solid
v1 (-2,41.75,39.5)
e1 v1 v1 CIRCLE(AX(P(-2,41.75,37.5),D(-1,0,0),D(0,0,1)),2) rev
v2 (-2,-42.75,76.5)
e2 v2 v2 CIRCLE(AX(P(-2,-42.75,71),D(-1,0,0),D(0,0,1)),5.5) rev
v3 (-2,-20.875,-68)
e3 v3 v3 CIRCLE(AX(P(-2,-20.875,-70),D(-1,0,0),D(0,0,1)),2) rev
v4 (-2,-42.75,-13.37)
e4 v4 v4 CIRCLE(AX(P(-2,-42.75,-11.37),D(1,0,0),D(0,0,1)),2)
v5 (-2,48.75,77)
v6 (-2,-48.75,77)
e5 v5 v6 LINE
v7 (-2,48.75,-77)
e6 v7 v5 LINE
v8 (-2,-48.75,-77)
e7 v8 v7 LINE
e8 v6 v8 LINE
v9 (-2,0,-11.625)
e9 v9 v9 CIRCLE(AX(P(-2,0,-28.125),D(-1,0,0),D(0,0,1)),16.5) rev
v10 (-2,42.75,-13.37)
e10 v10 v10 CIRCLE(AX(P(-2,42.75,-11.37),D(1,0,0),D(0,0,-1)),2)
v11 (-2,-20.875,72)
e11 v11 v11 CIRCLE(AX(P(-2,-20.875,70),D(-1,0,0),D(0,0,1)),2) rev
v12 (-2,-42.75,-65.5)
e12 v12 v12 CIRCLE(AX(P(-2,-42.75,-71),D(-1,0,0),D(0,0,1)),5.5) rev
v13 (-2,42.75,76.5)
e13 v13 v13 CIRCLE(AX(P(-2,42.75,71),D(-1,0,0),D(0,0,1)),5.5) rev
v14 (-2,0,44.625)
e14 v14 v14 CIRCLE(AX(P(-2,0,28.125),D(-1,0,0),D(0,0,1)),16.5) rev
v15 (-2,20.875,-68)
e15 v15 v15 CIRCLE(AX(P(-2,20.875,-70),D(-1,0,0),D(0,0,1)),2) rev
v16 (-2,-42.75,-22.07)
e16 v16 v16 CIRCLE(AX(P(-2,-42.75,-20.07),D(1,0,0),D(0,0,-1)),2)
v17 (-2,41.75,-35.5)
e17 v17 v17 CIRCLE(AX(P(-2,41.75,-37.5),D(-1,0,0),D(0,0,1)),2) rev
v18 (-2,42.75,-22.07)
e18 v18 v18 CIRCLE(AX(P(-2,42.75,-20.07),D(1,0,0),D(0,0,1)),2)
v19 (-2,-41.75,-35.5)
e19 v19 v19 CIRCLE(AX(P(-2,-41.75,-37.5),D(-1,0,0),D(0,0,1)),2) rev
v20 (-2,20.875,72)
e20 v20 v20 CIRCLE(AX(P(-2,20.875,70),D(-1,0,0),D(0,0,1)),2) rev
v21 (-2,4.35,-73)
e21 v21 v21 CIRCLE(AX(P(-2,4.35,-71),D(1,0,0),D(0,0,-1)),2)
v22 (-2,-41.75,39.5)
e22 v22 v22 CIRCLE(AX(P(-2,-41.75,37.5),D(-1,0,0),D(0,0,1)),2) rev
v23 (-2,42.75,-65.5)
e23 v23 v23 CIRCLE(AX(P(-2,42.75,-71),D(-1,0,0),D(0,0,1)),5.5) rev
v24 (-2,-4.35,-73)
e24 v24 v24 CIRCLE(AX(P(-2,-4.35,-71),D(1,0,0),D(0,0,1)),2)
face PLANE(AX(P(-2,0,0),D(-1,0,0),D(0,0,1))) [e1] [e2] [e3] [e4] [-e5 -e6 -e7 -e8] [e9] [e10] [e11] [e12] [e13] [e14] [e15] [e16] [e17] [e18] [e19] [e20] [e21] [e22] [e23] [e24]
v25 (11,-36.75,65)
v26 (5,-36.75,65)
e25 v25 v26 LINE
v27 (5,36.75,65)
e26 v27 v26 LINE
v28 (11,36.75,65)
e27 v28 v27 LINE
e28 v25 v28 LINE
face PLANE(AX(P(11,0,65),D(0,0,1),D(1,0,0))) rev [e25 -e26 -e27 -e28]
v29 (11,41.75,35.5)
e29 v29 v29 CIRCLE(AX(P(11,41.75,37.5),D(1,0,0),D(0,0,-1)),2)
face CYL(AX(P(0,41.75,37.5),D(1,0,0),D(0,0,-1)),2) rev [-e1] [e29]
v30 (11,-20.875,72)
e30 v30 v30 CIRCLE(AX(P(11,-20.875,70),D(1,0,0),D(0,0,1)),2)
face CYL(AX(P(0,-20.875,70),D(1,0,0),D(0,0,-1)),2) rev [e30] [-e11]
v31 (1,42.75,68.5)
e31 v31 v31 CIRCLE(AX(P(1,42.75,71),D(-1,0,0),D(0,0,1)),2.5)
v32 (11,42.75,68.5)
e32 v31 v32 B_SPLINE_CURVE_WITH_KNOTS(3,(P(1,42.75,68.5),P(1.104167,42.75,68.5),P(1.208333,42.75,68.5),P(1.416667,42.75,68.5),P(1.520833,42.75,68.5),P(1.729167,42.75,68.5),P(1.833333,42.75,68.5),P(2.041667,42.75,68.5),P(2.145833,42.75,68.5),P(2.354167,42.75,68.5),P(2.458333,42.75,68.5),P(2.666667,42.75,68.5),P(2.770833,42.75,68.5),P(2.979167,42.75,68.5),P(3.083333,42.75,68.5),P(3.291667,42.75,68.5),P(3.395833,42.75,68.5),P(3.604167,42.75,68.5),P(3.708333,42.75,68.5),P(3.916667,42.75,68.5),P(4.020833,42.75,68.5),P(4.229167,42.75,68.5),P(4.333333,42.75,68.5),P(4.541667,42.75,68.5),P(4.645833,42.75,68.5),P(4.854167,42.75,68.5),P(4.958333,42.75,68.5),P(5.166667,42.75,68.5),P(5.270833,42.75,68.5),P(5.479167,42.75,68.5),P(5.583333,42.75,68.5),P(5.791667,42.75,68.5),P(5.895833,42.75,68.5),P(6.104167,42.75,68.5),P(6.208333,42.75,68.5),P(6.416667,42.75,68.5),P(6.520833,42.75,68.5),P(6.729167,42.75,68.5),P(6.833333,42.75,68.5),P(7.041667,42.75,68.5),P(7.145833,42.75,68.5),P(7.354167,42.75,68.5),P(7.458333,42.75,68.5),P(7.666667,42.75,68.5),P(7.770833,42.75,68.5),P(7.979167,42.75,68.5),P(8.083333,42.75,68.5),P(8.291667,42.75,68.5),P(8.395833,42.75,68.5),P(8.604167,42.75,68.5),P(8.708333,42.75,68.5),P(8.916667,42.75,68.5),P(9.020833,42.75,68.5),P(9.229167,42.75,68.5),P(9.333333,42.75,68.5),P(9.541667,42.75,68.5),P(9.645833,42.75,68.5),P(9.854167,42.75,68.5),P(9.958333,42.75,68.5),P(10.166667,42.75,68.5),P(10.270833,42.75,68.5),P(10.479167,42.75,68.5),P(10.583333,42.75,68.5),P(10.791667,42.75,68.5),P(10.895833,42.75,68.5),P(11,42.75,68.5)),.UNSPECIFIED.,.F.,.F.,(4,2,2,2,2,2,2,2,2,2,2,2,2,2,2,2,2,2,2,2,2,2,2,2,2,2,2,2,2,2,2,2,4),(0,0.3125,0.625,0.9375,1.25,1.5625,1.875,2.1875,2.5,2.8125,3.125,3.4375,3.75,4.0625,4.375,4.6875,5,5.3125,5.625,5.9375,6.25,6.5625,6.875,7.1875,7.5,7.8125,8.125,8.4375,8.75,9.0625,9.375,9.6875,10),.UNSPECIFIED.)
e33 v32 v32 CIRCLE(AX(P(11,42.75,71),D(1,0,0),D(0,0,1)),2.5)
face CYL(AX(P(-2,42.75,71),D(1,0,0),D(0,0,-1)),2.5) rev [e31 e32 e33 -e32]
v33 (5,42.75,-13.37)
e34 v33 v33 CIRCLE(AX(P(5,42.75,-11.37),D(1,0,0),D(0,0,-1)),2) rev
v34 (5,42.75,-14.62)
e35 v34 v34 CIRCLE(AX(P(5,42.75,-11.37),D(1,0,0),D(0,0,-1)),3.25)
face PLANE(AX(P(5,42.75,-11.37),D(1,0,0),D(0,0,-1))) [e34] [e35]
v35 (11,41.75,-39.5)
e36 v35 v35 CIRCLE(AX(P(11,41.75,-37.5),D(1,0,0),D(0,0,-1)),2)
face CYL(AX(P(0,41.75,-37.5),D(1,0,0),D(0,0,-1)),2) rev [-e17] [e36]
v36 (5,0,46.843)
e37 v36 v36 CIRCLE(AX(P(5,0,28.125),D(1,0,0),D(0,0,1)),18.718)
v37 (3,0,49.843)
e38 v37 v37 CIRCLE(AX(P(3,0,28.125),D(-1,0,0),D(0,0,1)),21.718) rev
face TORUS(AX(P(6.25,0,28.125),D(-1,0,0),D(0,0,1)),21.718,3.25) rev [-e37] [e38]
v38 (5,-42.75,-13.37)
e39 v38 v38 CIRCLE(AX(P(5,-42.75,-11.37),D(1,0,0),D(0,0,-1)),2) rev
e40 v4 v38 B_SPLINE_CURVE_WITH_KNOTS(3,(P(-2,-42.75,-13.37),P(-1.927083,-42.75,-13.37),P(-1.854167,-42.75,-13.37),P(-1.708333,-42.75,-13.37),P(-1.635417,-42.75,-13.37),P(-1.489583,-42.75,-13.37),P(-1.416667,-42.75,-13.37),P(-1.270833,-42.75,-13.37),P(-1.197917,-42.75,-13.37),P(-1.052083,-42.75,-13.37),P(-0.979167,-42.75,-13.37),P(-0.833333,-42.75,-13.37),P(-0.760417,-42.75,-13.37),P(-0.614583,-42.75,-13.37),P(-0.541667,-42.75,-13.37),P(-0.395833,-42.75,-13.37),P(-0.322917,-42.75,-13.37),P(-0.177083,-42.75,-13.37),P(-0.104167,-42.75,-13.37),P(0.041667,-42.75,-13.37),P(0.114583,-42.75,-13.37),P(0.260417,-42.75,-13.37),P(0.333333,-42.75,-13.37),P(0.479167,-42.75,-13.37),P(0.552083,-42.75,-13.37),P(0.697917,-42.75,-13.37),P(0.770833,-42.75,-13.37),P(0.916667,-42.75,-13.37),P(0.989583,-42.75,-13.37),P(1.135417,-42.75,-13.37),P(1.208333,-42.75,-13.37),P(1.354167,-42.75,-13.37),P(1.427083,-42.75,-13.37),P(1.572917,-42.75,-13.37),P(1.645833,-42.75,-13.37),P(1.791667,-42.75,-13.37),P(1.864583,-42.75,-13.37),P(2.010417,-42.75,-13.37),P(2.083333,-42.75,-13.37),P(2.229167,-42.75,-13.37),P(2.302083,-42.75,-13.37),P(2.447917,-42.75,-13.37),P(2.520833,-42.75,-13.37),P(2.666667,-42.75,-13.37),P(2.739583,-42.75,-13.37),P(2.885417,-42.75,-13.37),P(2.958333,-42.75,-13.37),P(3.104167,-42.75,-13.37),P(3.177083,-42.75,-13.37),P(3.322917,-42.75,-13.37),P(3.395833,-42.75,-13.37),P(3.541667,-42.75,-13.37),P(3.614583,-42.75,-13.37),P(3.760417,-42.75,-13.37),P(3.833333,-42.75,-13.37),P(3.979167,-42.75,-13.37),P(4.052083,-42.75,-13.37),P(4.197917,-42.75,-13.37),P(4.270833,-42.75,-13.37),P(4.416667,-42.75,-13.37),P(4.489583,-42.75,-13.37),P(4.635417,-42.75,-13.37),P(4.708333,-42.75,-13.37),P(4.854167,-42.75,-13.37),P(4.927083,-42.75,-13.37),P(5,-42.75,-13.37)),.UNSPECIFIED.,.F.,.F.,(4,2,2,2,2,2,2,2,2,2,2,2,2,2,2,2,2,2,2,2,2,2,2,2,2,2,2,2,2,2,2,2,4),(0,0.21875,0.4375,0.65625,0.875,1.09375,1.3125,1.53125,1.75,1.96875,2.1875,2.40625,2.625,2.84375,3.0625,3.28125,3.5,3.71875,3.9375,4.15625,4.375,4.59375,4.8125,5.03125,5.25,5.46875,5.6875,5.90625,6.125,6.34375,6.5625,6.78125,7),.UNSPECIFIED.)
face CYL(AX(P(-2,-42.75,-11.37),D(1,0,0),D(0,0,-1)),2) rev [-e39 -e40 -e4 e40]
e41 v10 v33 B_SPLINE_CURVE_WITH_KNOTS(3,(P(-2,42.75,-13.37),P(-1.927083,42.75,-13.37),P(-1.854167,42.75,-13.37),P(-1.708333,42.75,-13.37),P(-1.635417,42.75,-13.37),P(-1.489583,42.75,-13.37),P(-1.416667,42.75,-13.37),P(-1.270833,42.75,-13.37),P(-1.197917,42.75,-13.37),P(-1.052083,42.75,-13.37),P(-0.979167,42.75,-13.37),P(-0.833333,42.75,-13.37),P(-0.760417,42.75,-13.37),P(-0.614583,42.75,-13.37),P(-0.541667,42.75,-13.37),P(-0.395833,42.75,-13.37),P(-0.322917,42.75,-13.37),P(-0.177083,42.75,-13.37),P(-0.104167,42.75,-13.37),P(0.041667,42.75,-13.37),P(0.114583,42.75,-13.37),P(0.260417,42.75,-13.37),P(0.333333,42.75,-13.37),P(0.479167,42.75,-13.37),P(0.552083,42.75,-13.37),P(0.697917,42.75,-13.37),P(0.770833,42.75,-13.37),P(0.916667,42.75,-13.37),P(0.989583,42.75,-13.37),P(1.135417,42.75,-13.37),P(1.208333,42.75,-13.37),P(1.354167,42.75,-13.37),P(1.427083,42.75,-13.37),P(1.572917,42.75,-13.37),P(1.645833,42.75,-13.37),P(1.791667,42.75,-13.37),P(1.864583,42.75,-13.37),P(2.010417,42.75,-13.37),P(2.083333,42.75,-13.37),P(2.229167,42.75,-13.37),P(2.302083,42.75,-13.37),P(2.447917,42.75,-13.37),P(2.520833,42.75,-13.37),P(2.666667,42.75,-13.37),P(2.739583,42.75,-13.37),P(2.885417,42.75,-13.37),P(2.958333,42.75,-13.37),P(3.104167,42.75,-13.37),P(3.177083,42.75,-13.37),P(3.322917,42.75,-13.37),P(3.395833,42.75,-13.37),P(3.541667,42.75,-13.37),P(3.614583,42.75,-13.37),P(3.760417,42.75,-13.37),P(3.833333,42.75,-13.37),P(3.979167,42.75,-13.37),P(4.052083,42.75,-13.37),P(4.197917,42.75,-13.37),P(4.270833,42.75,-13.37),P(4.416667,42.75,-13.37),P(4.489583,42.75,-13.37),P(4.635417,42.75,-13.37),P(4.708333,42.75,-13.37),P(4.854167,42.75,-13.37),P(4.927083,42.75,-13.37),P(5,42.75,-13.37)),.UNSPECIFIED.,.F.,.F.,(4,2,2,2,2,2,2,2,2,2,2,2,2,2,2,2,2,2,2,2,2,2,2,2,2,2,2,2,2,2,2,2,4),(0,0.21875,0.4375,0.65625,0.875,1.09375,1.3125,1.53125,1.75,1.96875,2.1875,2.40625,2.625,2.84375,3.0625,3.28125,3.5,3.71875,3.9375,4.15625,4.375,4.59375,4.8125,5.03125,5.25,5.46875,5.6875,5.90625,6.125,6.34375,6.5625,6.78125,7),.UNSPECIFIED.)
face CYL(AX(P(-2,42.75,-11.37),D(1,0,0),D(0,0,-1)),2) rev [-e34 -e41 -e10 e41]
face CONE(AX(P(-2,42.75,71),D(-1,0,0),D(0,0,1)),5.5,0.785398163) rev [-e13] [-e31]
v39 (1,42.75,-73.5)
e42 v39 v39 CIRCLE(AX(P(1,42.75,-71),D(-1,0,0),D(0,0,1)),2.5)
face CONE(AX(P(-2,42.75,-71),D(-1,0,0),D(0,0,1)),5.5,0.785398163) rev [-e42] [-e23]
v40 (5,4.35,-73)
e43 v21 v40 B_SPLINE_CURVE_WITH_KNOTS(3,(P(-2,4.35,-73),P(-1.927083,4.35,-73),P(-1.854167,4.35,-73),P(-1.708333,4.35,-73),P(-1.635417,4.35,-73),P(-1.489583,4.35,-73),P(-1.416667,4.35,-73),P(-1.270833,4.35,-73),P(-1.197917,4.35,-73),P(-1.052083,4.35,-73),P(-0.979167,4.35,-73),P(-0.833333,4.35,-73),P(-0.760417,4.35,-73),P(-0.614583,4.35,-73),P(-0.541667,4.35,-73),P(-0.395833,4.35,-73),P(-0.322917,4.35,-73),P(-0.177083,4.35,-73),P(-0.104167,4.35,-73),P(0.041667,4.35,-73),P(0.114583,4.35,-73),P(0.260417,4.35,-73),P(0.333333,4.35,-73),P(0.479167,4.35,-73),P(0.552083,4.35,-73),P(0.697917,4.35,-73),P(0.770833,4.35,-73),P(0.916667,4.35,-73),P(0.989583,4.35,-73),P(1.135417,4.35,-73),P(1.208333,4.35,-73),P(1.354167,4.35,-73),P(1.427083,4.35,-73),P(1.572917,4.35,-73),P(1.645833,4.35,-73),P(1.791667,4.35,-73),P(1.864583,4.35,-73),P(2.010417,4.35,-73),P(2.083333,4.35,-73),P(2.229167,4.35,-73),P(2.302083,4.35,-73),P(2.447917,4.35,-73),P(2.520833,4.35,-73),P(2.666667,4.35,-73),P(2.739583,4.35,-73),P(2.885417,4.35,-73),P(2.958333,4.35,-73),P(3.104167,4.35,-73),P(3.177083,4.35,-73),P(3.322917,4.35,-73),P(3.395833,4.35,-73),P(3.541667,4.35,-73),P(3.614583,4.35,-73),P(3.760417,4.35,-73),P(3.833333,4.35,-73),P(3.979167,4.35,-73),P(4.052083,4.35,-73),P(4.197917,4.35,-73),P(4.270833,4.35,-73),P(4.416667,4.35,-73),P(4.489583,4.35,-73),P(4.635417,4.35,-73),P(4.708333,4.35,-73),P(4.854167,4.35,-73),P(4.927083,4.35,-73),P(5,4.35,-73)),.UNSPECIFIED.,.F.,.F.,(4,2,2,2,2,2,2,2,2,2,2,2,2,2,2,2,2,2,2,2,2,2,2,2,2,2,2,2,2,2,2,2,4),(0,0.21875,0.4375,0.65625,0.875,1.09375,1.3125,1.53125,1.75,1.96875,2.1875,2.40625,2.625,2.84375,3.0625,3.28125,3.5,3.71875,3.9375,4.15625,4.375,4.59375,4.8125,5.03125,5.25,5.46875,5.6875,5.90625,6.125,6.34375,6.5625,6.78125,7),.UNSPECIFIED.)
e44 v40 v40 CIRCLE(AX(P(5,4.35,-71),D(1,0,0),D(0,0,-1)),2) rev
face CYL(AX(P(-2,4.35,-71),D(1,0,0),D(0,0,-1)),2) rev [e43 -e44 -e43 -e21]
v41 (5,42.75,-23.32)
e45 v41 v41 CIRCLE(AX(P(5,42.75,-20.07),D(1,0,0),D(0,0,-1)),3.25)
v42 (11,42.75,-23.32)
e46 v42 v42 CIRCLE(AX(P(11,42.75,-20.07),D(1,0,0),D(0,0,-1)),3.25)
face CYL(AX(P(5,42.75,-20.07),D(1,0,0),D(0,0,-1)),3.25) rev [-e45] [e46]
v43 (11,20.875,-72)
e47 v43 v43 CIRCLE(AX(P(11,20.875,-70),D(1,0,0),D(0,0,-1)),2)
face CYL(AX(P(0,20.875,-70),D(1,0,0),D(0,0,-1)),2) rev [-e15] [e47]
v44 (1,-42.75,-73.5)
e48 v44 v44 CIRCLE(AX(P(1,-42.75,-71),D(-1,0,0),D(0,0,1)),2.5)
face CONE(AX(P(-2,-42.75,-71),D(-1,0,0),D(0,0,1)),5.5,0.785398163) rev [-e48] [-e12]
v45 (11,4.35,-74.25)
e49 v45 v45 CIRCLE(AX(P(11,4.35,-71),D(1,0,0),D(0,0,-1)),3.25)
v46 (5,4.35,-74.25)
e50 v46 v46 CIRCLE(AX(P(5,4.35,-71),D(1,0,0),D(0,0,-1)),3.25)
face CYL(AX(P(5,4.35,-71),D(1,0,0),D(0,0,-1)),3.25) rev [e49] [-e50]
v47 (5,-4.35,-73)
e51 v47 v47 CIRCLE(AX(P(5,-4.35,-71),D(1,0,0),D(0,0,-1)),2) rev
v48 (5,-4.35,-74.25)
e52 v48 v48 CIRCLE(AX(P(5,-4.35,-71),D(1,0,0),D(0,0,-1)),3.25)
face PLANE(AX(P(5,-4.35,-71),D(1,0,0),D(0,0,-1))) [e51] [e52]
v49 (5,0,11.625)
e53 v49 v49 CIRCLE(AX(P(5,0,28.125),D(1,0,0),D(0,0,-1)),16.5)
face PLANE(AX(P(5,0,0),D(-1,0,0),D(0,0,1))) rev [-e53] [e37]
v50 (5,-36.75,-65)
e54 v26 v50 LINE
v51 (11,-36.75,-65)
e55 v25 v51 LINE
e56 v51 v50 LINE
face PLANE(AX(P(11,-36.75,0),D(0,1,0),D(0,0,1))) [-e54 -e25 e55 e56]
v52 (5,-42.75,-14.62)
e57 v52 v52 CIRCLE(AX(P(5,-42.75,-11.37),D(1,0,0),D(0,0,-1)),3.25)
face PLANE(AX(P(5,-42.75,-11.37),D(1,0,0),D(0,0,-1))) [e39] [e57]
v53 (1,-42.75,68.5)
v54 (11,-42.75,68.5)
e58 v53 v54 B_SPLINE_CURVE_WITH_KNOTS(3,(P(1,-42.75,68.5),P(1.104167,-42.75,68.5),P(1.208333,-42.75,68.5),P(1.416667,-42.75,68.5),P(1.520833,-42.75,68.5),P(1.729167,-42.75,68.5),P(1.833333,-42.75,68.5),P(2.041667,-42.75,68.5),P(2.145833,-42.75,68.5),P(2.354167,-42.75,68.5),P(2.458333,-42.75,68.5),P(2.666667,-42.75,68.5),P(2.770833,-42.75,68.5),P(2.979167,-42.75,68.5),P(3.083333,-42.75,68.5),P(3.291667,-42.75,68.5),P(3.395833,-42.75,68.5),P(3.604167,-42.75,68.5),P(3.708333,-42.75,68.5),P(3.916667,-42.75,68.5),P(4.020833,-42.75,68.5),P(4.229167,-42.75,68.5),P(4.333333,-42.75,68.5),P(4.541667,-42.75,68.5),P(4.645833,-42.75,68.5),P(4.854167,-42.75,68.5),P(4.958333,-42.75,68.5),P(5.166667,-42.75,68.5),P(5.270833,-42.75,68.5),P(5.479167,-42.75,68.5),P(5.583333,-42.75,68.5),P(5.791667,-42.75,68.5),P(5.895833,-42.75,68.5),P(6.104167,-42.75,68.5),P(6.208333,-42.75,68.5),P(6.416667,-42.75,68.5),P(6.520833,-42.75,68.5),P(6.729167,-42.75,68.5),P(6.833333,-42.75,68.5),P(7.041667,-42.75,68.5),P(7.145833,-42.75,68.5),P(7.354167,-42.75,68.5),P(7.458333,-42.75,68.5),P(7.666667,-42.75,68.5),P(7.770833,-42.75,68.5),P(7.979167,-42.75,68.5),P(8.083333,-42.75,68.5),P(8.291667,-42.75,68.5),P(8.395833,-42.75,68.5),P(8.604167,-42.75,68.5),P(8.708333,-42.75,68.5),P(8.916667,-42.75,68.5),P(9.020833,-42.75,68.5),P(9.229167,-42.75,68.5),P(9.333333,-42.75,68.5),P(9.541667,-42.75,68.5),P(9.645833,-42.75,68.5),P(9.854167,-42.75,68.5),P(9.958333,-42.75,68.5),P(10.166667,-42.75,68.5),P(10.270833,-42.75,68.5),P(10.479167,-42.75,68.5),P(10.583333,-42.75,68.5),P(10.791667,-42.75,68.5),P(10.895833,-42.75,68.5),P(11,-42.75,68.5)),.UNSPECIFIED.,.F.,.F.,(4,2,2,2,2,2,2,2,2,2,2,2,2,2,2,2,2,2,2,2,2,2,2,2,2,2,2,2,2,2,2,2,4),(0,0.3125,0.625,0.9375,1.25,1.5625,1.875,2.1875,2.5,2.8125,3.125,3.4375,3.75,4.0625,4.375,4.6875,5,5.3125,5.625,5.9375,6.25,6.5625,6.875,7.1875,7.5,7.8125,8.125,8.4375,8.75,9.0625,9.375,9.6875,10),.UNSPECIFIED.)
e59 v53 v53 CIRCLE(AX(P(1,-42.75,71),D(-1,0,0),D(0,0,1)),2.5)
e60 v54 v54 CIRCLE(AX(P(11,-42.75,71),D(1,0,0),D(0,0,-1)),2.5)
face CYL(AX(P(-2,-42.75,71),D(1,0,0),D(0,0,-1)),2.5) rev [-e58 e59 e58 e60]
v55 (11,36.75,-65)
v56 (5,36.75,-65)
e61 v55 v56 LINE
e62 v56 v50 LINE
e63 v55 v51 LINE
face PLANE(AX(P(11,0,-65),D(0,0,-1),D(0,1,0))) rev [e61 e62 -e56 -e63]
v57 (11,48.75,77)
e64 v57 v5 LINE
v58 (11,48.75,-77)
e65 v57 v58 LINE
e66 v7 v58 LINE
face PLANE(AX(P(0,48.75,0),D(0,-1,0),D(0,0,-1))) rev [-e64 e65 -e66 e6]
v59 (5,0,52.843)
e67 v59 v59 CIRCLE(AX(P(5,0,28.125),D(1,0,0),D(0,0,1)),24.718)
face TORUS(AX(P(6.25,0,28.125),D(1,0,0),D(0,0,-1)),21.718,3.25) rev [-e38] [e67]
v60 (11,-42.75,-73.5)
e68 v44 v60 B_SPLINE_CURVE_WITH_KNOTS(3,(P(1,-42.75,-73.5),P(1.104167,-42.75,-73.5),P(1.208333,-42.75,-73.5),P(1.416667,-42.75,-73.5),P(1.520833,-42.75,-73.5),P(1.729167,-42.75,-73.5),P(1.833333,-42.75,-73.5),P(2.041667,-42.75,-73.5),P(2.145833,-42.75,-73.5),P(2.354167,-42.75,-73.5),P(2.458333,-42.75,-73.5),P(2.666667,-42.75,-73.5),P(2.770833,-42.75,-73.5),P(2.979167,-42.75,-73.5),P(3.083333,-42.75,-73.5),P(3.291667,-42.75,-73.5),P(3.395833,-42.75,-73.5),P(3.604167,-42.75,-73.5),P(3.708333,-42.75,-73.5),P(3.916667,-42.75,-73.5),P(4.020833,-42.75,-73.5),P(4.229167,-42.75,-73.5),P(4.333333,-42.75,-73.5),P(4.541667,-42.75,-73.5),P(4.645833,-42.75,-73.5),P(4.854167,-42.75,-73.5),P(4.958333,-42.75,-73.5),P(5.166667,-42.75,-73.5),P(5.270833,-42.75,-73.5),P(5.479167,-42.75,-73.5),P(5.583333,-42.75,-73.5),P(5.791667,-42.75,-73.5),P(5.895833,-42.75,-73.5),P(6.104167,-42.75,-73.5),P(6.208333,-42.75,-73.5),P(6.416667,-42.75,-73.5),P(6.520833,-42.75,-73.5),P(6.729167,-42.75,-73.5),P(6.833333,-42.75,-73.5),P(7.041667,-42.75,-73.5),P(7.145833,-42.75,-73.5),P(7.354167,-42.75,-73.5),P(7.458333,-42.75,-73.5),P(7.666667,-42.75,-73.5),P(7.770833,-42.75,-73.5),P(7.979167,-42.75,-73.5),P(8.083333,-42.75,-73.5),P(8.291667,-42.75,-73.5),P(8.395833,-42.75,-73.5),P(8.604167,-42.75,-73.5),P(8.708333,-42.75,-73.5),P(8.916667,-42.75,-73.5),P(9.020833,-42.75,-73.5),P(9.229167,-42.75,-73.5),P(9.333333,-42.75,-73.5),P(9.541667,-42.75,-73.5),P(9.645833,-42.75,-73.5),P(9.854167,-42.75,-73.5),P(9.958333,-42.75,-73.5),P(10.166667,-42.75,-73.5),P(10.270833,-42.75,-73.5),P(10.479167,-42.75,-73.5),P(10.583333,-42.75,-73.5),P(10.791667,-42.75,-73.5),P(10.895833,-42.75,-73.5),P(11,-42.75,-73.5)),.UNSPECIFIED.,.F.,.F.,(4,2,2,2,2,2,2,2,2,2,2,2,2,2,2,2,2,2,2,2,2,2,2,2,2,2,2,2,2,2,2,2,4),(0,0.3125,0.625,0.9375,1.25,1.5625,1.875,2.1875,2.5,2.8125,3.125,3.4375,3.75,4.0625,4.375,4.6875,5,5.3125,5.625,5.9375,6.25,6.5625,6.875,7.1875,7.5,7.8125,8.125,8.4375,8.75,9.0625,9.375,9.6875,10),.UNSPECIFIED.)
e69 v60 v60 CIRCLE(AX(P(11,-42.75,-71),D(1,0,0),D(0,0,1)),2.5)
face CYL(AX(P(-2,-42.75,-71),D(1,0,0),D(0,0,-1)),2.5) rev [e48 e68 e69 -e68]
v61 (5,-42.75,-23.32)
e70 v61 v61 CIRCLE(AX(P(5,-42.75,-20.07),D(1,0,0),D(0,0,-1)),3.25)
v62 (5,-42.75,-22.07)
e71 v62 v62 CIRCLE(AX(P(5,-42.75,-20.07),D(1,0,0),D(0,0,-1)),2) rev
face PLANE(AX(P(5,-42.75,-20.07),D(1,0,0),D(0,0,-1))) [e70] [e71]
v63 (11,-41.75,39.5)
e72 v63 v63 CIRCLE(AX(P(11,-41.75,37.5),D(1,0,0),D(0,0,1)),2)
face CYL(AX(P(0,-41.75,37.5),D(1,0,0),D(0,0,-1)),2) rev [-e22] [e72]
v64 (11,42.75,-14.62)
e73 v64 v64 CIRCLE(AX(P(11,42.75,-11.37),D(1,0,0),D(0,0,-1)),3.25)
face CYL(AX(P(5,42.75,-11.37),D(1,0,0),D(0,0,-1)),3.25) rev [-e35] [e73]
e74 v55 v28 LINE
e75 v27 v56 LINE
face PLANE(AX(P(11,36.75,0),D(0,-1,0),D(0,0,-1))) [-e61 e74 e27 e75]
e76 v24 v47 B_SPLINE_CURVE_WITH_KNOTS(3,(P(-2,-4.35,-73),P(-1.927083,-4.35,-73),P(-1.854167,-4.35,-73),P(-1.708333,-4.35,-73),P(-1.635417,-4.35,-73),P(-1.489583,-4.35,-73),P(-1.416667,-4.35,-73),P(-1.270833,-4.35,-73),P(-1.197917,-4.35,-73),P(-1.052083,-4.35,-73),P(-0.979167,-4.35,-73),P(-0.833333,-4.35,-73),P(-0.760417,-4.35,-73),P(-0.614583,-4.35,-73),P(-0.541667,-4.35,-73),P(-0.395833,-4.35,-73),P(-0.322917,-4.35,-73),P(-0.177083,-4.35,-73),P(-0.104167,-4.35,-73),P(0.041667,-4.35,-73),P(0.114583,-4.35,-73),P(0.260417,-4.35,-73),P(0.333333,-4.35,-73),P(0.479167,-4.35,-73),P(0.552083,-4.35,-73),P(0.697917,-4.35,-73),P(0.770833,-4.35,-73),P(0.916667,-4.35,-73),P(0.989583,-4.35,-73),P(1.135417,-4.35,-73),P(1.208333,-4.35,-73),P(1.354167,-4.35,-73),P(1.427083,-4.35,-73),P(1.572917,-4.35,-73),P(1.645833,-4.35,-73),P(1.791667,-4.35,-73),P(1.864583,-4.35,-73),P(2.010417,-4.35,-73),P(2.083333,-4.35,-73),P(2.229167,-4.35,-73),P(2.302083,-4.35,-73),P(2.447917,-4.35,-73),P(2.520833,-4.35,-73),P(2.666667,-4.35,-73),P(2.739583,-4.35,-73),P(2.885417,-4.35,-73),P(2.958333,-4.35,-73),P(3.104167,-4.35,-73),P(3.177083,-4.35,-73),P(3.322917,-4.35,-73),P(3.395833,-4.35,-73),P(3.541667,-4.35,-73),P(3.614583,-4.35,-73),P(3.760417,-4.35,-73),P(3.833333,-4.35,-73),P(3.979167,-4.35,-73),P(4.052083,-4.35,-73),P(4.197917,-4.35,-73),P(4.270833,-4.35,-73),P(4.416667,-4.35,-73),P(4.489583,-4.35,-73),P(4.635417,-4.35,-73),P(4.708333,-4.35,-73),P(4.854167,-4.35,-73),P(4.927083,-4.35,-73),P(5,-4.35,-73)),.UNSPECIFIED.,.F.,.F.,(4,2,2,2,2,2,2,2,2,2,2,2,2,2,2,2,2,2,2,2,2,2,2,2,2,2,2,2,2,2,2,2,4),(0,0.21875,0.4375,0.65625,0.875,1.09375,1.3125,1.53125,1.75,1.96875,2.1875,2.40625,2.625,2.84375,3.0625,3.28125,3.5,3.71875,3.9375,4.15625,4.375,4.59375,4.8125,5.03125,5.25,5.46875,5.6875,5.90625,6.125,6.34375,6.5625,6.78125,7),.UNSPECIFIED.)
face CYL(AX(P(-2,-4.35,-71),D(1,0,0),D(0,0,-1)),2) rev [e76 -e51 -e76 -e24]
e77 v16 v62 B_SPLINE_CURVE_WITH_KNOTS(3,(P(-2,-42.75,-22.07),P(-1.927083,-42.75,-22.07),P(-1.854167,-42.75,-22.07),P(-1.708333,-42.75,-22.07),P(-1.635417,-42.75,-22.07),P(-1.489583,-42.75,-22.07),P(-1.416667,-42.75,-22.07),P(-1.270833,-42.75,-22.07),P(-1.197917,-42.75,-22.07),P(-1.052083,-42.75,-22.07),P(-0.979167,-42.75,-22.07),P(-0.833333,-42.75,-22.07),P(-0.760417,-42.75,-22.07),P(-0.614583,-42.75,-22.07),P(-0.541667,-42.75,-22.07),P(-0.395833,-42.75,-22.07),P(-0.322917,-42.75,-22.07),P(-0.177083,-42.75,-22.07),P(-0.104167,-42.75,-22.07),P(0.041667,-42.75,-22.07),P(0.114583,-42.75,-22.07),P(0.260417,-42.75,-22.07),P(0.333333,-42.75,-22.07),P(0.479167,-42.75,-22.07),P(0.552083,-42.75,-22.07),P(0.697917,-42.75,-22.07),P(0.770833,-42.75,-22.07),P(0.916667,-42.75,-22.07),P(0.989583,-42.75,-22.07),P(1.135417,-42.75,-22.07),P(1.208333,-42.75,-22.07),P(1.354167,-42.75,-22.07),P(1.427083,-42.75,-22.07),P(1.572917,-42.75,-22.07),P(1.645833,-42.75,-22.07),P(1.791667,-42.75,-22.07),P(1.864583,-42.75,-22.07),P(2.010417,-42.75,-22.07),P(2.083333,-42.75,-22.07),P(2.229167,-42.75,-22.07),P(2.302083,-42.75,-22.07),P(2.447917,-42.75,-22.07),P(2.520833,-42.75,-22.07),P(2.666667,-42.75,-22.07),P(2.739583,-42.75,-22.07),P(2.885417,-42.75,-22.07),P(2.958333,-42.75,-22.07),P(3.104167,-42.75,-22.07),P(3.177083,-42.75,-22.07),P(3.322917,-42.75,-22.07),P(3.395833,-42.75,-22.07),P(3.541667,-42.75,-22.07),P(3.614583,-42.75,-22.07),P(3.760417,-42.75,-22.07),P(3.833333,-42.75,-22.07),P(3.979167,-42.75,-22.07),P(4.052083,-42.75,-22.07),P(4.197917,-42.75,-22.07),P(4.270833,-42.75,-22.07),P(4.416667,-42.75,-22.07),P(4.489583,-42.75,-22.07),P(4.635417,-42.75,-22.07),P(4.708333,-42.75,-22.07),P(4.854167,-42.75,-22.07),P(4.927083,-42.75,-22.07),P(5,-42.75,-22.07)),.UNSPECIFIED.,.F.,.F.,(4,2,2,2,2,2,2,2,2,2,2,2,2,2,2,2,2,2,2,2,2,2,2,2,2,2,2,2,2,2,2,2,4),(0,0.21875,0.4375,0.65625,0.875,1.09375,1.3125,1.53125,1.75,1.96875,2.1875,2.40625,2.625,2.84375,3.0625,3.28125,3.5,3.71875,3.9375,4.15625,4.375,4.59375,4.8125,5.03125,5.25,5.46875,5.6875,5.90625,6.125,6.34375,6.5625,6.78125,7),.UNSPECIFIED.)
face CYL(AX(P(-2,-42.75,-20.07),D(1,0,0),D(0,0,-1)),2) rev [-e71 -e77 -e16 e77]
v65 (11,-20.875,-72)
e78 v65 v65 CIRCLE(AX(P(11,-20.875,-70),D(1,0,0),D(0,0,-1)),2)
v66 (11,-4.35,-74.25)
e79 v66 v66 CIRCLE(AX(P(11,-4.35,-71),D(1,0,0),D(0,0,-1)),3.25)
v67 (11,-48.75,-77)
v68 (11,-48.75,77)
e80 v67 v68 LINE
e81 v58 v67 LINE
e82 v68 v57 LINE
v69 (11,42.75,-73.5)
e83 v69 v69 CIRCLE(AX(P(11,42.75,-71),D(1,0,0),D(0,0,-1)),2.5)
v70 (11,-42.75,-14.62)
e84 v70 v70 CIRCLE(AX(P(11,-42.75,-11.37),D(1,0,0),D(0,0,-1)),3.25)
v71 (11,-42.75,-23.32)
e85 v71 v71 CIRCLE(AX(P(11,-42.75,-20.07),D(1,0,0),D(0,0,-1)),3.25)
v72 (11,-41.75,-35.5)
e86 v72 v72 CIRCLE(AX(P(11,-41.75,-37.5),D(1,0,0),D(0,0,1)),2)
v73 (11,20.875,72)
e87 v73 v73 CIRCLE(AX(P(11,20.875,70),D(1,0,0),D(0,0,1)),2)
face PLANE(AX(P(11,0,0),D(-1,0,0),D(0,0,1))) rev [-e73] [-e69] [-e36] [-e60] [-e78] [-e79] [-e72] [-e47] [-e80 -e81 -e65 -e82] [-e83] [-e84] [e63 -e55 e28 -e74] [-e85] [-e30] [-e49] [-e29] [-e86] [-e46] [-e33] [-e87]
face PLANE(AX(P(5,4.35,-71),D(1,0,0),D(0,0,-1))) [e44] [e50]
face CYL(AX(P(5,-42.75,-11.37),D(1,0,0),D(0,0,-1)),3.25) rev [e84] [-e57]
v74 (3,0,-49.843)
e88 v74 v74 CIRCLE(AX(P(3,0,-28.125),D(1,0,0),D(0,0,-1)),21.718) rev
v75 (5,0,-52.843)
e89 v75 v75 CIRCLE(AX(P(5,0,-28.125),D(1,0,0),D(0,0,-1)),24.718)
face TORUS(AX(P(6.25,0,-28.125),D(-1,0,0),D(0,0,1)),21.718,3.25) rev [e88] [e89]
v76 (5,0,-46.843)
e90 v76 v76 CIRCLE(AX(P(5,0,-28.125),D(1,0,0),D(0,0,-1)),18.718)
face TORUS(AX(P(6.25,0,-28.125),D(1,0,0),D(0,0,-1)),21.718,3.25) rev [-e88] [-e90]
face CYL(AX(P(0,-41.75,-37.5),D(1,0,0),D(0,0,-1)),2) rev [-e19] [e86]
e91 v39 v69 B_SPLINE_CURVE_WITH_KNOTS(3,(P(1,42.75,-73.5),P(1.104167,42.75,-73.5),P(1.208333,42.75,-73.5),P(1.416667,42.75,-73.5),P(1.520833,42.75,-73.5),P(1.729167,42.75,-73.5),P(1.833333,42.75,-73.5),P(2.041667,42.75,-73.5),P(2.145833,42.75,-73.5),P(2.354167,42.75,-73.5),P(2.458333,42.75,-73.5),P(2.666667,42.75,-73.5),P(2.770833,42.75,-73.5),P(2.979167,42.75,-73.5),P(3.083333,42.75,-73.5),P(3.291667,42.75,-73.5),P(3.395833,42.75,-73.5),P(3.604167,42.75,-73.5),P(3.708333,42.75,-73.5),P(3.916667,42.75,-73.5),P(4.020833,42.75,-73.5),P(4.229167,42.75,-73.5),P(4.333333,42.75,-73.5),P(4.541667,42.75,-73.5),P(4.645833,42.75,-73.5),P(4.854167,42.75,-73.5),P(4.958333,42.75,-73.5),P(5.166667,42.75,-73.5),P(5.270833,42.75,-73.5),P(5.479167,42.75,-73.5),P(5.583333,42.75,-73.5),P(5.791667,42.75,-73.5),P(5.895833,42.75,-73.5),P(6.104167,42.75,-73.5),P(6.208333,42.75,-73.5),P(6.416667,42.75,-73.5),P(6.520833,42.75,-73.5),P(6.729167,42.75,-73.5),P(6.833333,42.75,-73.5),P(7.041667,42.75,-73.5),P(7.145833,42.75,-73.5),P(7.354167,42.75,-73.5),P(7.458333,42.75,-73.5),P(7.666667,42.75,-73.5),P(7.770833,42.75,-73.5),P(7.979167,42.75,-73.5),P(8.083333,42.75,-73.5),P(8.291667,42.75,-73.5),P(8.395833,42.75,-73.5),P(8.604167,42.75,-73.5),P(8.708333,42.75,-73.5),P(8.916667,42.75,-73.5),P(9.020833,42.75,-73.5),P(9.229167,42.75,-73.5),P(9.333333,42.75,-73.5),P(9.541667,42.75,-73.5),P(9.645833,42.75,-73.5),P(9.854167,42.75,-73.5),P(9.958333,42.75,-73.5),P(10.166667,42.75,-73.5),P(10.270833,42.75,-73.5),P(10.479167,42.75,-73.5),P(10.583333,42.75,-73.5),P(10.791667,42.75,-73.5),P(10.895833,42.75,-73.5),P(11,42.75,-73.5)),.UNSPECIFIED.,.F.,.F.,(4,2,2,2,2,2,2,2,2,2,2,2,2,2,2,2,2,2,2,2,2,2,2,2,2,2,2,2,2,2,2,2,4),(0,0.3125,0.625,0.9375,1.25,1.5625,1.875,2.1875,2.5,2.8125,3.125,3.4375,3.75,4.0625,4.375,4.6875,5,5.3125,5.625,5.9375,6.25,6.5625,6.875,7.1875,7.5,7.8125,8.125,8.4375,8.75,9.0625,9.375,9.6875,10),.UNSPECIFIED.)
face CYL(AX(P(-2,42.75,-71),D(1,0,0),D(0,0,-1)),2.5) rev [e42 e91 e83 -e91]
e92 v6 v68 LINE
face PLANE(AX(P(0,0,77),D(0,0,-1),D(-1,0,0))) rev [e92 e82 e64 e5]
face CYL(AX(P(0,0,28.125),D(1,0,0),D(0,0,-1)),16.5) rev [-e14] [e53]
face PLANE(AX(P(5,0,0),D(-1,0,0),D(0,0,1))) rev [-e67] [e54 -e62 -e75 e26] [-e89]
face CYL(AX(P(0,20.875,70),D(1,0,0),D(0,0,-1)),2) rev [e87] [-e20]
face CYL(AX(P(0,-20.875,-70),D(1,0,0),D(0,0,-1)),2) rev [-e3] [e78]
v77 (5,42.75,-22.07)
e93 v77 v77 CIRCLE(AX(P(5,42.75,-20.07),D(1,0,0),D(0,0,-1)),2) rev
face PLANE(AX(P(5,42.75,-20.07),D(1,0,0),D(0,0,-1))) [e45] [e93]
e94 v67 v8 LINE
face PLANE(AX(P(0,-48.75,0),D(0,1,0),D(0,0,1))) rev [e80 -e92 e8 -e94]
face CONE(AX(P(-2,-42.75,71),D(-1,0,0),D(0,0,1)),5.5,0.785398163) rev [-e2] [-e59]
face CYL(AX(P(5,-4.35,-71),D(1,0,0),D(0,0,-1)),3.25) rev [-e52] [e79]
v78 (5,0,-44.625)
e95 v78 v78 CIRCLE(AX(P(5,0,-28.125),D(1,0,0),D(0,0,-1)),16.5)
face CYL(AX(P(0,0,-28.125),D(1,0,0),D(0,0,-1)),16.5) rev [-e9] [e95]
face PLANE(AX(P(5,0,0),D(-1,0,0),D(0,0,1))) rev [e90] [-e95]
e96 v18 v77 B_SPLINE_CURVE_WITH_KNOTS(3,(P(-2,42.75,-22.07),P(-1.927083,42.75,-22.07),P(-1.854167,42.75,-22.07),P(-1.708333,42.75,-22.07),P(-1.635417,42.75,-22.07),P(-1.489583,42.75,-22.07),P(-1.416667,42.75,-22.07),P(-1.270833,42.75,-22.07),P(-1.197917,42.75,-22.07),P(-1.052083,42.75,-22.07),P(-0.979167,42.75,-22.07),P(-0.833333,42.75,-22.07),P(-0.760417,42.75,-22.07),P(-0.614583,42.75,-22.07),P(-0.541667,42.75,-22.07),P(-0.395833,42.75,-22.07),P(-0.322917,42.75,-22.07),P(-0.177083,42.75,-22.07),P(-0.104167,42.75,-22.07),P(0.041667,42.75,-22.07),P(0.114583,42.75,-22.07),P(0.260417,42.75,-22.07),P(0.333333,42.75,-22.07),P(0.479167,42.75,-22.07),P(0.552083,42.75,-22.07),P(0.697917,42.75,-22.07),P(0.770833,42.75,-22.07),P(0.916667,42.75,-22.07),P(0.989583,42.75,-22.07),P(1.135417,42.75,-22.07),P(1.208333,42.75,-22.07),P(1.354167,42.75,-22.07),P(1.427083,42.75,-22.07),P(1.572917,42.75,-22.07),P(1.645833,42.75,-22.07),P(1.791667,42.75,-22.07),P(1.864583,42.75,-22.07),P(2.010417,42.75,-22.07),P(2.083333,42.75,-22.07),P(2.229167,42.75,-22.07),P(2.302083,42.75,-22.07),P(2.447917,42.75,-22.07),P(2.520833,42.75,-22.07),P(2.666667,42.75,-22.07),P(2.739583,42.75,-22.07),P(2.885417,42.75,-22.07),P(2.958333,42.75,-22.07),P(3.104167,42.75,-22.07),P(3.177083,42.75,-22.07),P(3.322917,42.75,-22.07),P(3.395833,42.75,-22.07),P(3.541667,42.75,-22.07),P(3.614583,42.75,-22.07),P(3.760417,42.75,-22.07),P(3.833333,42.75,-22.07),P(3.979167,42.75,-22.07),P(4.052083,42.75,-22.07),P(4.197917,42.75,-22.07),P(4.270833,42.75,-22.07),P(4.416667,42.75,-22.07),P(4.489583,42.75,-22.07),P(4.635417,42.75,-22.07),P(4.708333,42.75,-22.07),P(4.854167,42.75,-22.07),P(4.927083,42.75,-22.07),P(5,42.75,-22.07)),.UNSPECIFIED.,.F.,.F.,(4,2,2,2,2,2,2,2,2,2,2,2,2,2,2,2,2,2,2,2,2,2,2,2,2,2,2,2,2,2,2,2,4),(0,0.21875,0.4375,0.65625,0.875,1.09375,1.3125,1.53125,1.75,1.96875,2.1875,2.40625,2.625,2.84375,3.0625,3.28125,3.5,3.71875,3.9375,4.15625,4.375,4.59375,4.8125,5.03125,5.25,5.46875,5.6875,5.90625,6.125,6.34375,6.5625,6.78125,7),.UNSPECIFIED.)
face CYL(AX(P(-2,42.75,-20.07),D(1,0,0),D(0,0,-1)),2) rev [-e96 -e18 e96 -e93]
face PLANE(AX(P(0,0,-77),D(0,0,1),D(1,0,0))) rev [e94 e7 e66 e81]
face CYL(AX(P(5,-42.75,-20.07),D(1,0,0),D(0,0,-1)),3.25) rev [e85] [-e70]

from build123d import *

# Parameters (mm, degrees)
SKETCH1_W           = 130
SKETCH1_H           = 73.5
BOSS_EXTRUDE1_DEPTH = 5
SKETCH2_R           = 24.718
SKETCH2_R_2         = 18.718
CUT_EXTRUDE1_DEPTH  = 2
FILLET1_R           = 3.25
SKETCH3_W           = 10
SKETCH3_H           = 73.5
BOSS_EXTRUDE2_DEPTH = 11
SKETCH4_R           = 2
CUT_EXTRUDE2_DEPTH  = 90.059320119
SKETCH5_R           = 16.5
CUT_EXTRUDE3_DEPTH  = 89.580824674
SKETCH7_W           = 150
SKETCH7_H           = 93.5
SKETCH7_R           = 16.5
SKETCH7_R_2         = 2
BOSS_EXTRUDE3_DEPTH = 2
SKETCH8_R           = 2
CUT_EXTRUDE5_DEPTH  = 90.328396941
SKETCH9_R           = 3.25
CUT_EXTRUDE6_DEPTH  = 6
SKETCH10_W          = 13
SKETCH10_H          = 150
BOSS_EXTRUDE4_DEPTH = 2
SKETCH11_W          = 13
SKETCH11_H          = 150
BOSS_EXTRUDE5_DEPTH = 2
SKETCH12_W          = 13
SKETCH12_H          = 97.5
BOSS_EXTRUDE6_DEPTH = 2
SKETCH13_W          = 13
SKETCH13_H          = 97.5
BOSS_EXTRUDE7_DEPTH = 2
SKETCH14_R          = 2.5
CUT_EXTRUDE7_DEPTH  = 93.057386993
CHAMFER1_SIZE       = 3


with BuildPart() as part:
    # Sketch1 → Boss-Extrude1 (new body)
    with BuildSketch(Plane(origin=(0, 0, 0), x_dir=(0, 0, -1), z_dir=(1, 0, 0))):
        Rectangle(SKETCH1_W, SKETCH1_H)
    extrude(amount=BOSS_EXTRUDE1_DEPTH)

    # Sketch2 → Cut-Extrude1 (cut)
    # profile 1 of 2: a face of its own
    with BuildSketch(Plane(origin=(5, 0, 0), x_dir=(0, 0, -1), z_dir=(1, 0, 0))):
        with Locations((28.125, 0)):
            Circle(SKETCH2_R)
        with Locations((28.125, 0)):
            Circle(SKETCH2_R_2, mode=Mode.SUBTRACT)
    # profile 2 of 2: a face of its own
    with BuildSketch(Plane(origin=(5, 0, 0), x_dir=(0, 0, -1), z_dir=(1, 0, 0))):
        with Locations(Location((-28.125, 0, 0), (0, 0, 180))):
            Circle(SKETCH2_R)
        with Locations(Location((-28.125, 0, 0), (0, 0, 180))):
            Circle(SKETCH2_R_2, mode=Mode.SUBTRACT)
    extrude(amount=-CUT_EXTRUDE1_DEPTH, mode=Mode.SUBTRACT)

    # Fillet1
    # the kernel refuses this fillet: 3.25 mm, written as the material it adds along each edge
    with BuildSketch(Plane(origin=(3, 0, -28.125), x_dir=(0, 0, -1), z_dir=(0, -1, 0))) as fillet1_piece_1:
        with BuildLine():
            CenterArc((21.718, 3.25), FILLET1_R, 270, 67.380135052)
            Line((21.718, 0), (21.718, -0.065))
            Line((21.718, -0.065), (24.718, -0.065))
            Line((24.718, -0.065), (24.783, 0))
            ThreePointArc((24.783, 0), (24.783, 1), (24.778, 1.975))
            Line((24.778, 1.975), (24.718, 2))
        make_face()
    revolve(axis=Axis((3, 0, -28.125), (1, 0, 0)))
    with BuildSketch(Plane(origin=(3, 0, -28.125), x_dir=(0, 0, -1), z_dir=(0, -1, 0))) as fillet1_piece_2:
        with BuildLine():
            CenterArc((21.718, 3.25), FILLET1_R, 202.619864948, 67.380135052)
            Line((18.718, 2), (18.658, 1.975))
            ThreePointArc((18.658, 1.975), (18.653, 1), (18.653, 0))
            Line((18.653, 0), (18.718, -0.065))
            Line((18.718, -0.065), (21.718, -0.065))
            Line((21.718, -0.065), (21.718, 0))
        make_face()
    revolve(axis=Axis((3, 0, -28.125), (1, 0, 0)))
    with BuildSketch(Plane(origin=(3, 0, 28.125), x_dir=(0, 0, 1), z_dir=(0, 1, 0))) as fillet1_piece_3:
        with BuildLine():
            CenterArc((21.718, 3.25), FILLET1_R, 270, 67.380135052)
            Line((21.718, 0), (21.718, -0.065))
            Line((21.718, -0.065), (24.718, -0.065))
            Line((24.718, -0.065), (24.783, 0))
            ThreePointArc((24.783, 0), (24.783, 1), (24.778, 1.975))
            Line((24.778, 1.975), (24.718, 2))
        make_face()
    revolve(axis=Axis((3, 0, 28.125), (1, 0, 0)))
    with BuildSketch(Plane(origin=(3, 0, 28.125), x_dir=(0, 0, 1), z_dir=(0, 1, 0))) as fillet1_piece_4:
        with BuildLine():
            CenterArc((21.718, 3.25), FILLET1_R, 202.619864948, 67.380135052)
            Line((18.718, 2), (18.658, 1.975))
            ThreePointArc((18.658, 1.975), (18.653, 1), (18.653, 0))
            Line((18.653, 0), (18.718, -0.065))
            Line((18.718, -0.065), (21.718, -0.065))
            Line((21.718, -0.065), (21.718, 0))
        make_face()
    revolve(axis=Axis((3, 0, 28.125), (1, 0, 0)))

    # Sketch3 → Boss-Extrude2 (add)
    with BuildSketch(Plane.ZY):
        Polygon((65, 36.75), (75, 36.75), (75, 46.75), (-75, 46.75), (-75, 36.75), (-65, 36.75), align=None)
        with Locations((70, 0)):
            Rectangle(SKETCH3_W, SKETCH3_H)
        Polygon((-65, -36.75), (-75, -36.75), (-75, -46.75), (75, -46.75), (75, -36.75), (65, -36.75), align=None)
        with Locations((-70, 0)):
            Rectangle(SKETCH3_W, SKETCH3_H)
    extrude(amount=-BOSS_EXTRUDE2_DEPTH)

    # Sketch4 → Cut-Extrude2 (cut, through all)
    with BuildSketch(Plane(origin=(11, 0, 0), x_dir=(0, 0, -1), z_dir=(1, 0, 0))):
        with Locations((-37.5, 41.75)):
            Circle(SKETCH4_R)
        with Locations((37.5, 41.75)):
            Circle(SKETCH4_R)
        with Locations((70, 20.875)):
            Circle(SKETCH4_R)
        with Locations(Location((-37.5, -41.75, 0), (0, 0, 180))):
            Circle(SKETCH4_R)
        with Locations(Location((37.5, -41.75, 0), (0, 0, 180))):
            Circle(SKETCH4_R)
        with Locations((70, -20.875)):
            Circle(SKETCH4_R)
        with Locations(Location((-70, 20.875, 0), (0, 0, 180))):
            Circle(SKETCH4_R)
        with Locations(Location((-70, -20.875, 0), (0, 0, 180))):
            Circle(SKETCH4_R)
    extrude(amount=-CUT_EXTRUDE2_DEPTH, mode=Mode.SUBTRACT)

    # Sketch5 → Cut-Extrude3 (cut, through all)
    with BuildSketch(Plane(origin=(5, 0, 0), x_dir=(0, 0, -1), z_dir=(1, 0, 0))):
        with Locations((-28.125, 0)):
            Circle(SKETCH5_R)
        with Locations((28.125, 0)):
            Circle(SKETCH5_R)
    extrude(amount=-CUT_EXTRUDE3_DEPTH, mode=Mode.SUBTRACT)

    # Sketch7 → Boss-Extrude3 (add)
    with BuildSketch(Plane.ZY):
        Rectangle(SKETCH7_W, SKETCH7_H)
        with Locations(Location((28.125, 0, 0), (0, 0, 180))):
            Circle(SKETCH7_R, mode=Mode.SUBTRACT)
        with Locations(Location((-28.125, 0, 0), (0, 0, 180))):
            Circle(SKETCH7_R, mode=Mode.SUBTRACT)
        with Locations(Location((-70, 20.875, 0), (0, 0, 180))):
            Circle(SKETCH7_R_2, mode=Mode.SUBTRACT)
        with Locations(Location((-70, -20.875, 0), (0, 0, 180))):
            Circle(SKETCH7_R_2, mode=Mode.SUBTRACT)
        with Locations((-37.5, -41.75)):
            Circle(SKETCH7_R_2, mode=Mode.SUBTRACT)
        with Locations((37.5, -41.75)):
            Circle(SKETCH7_R_2, mode=Mode.SUBTRACT)
        with Locations((70, -20.875)):
            Circle(SKETCH7_R_2, mode=Mode.SUBTRACT)
        with Locations((70, 20.875)):
            Circle(SKETCH7_R_2, mode=Mode.SUBTRACT)
        with Locations(Location((-37.5, 41.75, 0), (0, 0, 180))):
            Circle(SKETCH7_R_2, mode=Mode.SUBTRACT)
        with Locations(Location((37.5, 41.75, 0), (0, 0, 180))):
            Circle(SKETCH7_R_2, mode=Mode.SUBTRACT)
    extrude(amount=BOSS_EXTRUDE3_DEPTH)

    # Sketch8 → Cut-Extrude5 (cut, through all)
    with BuildSketch(Plane(origin=(11, 0, 0), x_dir=(0, 0, -1), z_dir=(1, 0, 0))):
        with Locations((11.37, 42.75)):
            Circle(SKETCH8_R)
        with Locations((20.07, 42.75)):
            Circle(SKETCH8_R)
        with Locations((11.37, -42.75)):
            Circle(SKETCH8_R)
        with Locations((20.07, -42.75)):
            Circle(SKETCH8_R)
        with Locations((71, 4.35)):
            Circle(SKETCH8_R)
        with Locations((71, -4.35)):
            Circle(SKETCH8_R)
    extrude(amount=-CUT_EXTRUDE5_DEPTH, mode=Mode.SUBTRACT)

    # Sketch9 → Cut-Extrude6 (cut)
    with BuildSketch(Plane(origin=(11, 0, 0), x_dir=(0, 0, -1), z_dir=(1, 0, 0))):
        with Locations((20.07, 42.75)):
            Circle(SKETCH9_R)
        with Locations((11.37, 42.75)):
            Circle(SKETCH9_R)
        with Locations((71, 4.35)):
            Circle(SKETCH9_R)
        with Locations((71, -4.35)):
            Circle(SKETCH9_R)
        with Locations((20.07, -42.75)):
            Circle(SKETCH9_R)
        with Locations((11.37, -42.75)):
            Circle(SKETCH9_R)
    extrude(amount=-CUT_EXTRUDE6_DEPTH, mode=Mode.SUBTRACT)

    # Sketch10 → Boss-Extrude4 (add)
    with BuildSketch(Plane(origin=(0, 46.75, 0), x_dir=(1, 0, 0), z_dir=(0, 1, 0))):
        with Locations((4.5, 0)):
            Rectangle(SKETCH10_W, SKETCH10_H)
    extrude(amount=BOSS_EXTRUDE4_DEPTH)

    # Sketch11 → Boss-Extrude5 (add)
    with BuildSketch(Plane.XZ.offset(46.75)):
        with Locations((4.5, 0)):
            Rectangle(SKETCH11_W, SKETCH11_H)
    extrude(amount=BOSS_EXTRUDE5_DEPTH)

    # Sketch12 → Boss-Extrude6 (add)
    with BuildSketch(Plane(origin=(0, 0, -75), x_dir=(-1, 0, 0), z_dir=(0, 0, -1))):
        with Locations((-4.5, 0)):
            Rectangle(SKETCH12_W, SKETCH12_H)
    extrude(amount=BOSS_EXTRUDE6_DEPTH)

    # Sketch13 → Boss-Extrude7 (add)
    with BuildSketch(Plane.XY.offset(75)):
        with Locations((4.5, 0)):
            Rectangle(SKETCH13_W, SKETCH13_H)
    extrude(amount=BOSS_EXTRUDE7_DEPTH)

    # Sketch14 → Cut-Extrude7 (cut, through all)
    with BuildSketch(Plane(origin=(11, 0, 0), x_dir=(0, 0, -1), z_dir=(1, 0, 0))):
        with Locations((71, 42.75)):
            Circle(SKETCH14_R)
        with Locations((-71, 42.75)):
            Circle(SKETCH14_R)
        with Locations((-71, -42.75)):
            Circle(SKETCH14_R)
        with Locations((71, -42.75)):
            Circle(SKETCH14_R)
    extrude(amount=-CUT_EXTRUDE7_DEPTH, mode=Mode.SUBTRACT)

    # Chamfer1
    chamfer1_edges = [part.edges().sort_by_distance(p)[0] for p in [
        (-2, -42.75, -68.5),
        (-2, -42.75, 73.5),
        (-2, 42.75, 73.5),
        (-2, 42.75, -68.5),
    ]]
    chamfer(chamfer1_edges, length=CHAMFER1_SIZE)


solid = part.part
